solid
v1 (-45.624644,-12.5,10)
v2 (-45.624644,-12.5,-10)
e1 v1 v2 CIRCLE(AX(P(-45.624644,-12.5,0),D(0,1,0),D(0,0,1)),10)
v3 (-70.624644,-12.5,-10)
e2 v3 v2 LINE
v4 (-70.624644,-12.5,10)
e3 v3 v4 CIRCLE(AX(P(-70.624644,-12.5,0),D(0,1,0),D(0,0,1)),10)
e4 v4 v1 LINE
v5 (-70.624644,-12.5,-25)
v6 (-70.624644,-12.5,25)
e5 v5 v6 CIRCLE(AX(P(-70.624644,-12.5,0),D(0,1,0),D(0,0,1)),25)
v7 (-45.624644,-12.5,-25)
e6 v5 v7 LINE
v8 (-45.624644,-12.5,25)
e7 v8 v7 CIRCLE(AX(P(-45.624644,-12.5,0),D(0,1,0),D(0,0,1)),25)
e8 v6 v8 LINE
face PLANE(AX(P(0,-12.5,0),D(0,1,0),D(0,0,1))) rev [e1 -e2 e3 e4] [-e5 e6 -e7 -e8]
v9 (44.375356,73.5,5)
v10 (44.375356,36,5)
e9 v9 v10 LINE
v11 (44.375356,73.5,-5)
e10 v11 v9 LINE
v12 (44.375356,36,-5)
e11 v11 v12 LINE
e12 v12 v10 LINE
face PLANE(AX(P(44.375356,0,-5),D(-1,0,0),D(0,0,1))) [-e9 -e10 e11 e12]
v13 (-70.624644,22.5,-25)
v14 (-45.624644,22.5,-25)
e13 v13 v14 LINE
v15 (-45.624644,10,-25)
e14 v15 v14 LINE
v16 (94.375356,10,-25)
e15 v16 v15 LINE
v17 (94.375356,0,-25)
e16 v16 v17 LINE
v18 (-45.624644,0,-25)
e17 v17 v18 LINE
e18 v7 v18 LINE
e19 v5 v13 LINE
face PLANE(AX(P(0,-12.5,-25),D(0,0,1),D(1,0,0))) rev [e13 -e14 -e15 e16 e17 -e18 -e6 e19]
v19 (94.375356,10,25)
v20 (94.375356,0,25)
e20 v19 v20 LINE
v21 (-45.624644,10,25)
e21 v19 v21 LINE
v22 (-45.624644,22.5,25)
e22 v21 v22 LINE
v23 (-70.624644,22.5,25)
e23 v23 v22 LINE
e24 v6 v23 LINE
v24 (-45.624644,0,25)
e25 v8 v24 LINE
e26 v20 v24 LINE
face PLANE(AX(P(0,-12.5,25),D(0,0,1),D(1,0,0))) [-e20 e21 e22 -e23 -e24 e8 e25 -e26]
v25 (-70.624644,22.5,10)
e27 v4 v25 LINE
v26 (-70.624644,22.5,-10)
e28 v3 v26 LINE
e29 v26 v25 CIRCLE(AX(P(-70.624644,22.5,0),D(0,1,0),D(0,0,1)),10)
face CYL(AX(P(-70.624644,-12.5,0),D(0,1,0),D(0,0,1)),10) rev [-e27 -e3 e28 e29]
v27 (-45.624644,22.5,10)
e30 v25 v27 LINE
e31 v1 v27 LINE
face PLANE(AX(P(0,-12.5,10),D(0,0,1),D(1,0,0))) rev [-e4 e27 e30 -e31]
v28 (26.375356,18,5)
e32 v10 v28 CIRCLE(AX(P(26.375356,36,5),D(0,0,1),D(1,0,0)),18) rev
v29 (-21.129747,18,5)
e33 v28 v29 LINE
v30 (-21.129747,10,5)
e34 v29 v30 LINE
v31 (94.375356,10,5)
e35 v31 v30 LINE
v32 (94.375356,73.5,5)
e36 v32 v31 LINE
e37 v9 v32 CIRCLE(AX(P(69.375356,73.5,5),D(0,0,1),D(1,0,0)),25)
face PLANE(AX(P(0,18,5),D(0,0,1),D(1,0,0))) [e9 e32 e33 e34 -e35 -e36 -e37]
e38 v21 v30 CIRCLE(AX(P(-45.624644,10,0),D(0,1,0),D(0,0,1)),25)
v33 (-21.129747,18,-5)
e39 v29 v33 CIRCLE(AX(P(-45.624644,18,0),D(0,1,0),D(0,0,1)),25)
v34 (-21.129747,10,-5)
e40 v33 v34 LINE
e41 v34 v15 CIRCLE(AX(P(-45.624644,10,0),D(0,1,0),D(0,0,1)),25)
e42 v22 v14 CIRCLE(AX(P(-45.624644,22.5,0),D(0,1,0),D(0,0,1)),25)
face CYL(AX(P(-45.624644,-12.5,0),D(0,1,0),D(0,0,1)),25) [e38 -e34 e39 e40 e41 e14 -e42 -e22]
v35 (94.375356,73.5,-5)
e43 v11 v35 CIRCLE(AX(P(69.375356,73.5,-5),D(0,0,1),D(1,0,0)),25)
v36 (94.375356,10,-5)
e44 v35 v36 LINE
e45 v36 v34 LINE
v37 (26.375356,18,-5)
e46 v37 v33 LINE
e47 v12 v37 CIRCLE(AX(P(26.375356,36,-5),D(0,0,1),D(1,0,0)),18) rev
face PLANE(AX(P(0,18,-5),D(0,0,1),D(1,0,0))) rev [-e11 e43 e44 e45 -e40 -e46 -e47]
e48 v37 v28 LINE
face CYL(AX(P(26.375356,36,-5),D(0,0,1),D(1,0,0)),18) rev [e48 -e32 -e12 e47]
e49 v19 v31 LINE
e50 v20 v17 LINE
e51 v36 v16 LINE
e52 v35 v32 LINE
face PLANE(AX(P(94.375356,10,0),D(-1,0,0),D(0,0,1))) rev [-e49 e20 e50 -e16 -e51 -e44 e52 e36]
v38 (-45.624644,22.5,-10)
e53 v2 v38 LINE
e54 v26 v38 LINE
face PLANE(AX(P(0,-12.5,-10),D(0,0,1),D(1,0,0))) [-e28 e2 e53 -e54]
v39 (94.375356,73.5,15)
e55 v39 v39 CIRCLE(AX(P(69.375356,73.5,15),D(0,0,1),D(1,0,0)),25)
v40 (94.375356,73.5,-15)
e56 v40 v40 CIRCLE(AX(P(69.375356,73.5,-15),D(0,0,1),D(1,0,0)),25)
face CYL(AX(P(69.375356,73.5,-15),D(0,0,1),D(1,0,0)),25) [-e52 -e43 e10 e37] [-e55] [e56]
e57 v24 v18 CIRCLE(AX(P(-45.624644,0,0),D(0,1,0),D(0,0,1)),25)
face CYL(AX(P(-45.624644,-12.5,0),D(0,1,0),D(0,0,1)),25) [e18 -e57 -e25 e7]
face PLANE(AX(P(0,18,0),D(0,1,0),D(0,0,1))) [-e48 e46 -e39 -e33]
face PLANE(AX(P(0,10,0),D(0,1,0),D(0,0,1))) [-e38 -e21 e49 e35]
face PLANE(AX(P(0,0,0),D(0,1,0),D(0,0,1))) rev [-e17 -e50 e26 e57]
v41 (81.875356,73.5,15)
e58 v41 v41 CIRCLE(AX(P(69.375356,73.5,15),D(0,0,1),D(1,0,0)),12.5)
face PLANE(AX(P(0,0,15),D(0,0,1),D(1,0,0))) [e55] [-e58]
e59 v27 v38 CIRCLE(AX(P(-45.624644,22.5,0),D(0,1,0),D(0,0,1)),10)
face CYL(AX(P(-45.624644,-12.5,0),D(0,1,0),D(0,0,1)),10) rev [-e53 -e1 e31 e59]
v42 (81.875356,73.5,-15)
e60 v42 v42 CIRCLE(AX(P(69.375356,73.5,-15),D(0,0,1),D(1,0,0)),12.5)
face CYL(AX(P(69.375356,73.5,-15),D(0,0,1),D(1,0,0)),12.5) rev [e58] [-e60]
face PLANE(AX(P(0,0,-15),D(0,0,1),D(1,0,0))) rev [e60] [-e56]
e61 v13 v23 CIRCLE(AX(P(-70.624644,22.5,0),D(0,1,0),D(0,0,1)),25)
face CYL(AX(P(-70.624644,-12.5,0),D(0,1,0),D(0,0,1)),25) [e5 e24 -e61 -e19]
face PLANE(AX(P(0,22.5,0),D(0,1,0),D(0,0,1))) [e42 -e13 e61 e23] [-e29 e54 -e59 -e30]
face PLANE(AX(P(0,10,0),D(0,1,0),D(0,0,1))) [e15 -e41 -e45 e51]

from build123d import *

# Parameters (mm, degrees)
BOSS_EXTRUDE10_DEPTH       = 22.5
BOSS_EXTRUDE10_DEPTH_BACK  = 12.5
BOSS_EXTRUDE11_DEPTH       = 10
BOSS_EXTRUDE12_DEPTH       = 18
BOSS_EXTRUDE13_DEPTH       = 5
BOSS_EXTRUDE13_DEPTH_BACK  = 5
BOSS_EXTRUDE14_START       = -15
BOSS_EXTRUDE14_OUTLINE_R   = 25
BOSS_EXTRUDE14_OUTLINE_R_2 = 12.5
BOSS_EXTRUDE14_DEPTH       = 30


# Read off the part's stored shape, not the designer's step: Boss-Extrude14
with BuildPart() as part:
    # Sketch1 → Boss-Extrude10 (new, two sides: drawn at the far end of the back side and taken through both)
    with BuildSketch(Plane(origin=(0, 0, 0), x_dir=(1, 0, 0), z_dir=(0, 1, 0)).offset(-BOSS_EXTRUDE10_DEPTH_BACK)):
        with BuildLine():
            Line((-70.624644485, -25), (-45.624644485, -25))
            ThreePointArc((-45.624644485, -25), (-20.624644485, 0), (-45.624644485, 25))
            Line((-45.624644485, 25), (-70.624644485, 25))
            ThreePointArc((-70.624644485, 25), (-95.624644485, 0), (-70.624644485, -25))
        make_face()
        with BuildLine():
            ThreePointArc((-45.624644485, -10), (-35.624644485, 0), (-45.624644485, 10))
            Line((-45.624644485, 10), (-70.624644485, 10))
            ThreePointArc((-70.624644485, 10), (-80.624644485, 0), (-70.624644485, -10))
            Line((-70.624644485, -10), (-45.624644485, -10))
        make_face(mode=Mode.SUBTRACT)
    extrude(amount=BOSS_EXTRUDE10_DEPTH + BOSS_EXTRUDE10_DEPTH_BACK)

    # Sketch1<6> → Boss-Extrude11 (add)
    with BuildSketch(Plane(origin=(0, 0, 0), x_dir=(1, 0, 0), z_dir=(0, 1, 0))):
        with BuildLine():
            ThreePointArc((-21.129747057, -5), (-29.813256184, -19.364916731), (-45.624644485, -25))
            Line((-45.624644485, -25), (94.375355515, -25))
            Line((94.375355515, -25), (94.375355515, -5))
            Line((94.375355515, -5), (-21.129747057, -5))
        make_face()
        with BuildLine():
            Line((94.375355515, 25), (-45.624644485, 25))
            ThreePointArc((-45.624644485, 25), (-29.813256184, 19.364916731), (-21.129747057, 5))
            Line((-21.129747057, 5), (94.375355515, 5))
            Line((94.375355515, 5), (94.375355515, 25))
        make_face()
    extrude(amount=BOSS_EXTRUDE11_DEPTH)

    # Sketch1<7> → Boss-Extrude12 (add)
    with BuildSketch(Plane(origin=(0, 0, 0), x_dir=(1, 0, 0), z_dir=(0, 1, 0))):
        with BuildLine():
            Line((94.375355515, 5), (-21.129747057, 5))
            ThreePointArc((-21.129747057, 5), (-20.624644485, 0), (-21.129747057, -5))
            Line((-21.129747057, -5), (94.375355515, -5))
            Line((94.375355515, -5), (94.375355515, 5))
        make_face()
    extrude(amount=BOSS_EXTRUDE12_DEPTH)

    # Sketch2 → Boss-Extrude13 (add, two sides: drawn at the far end of the back side and taken through both)
    with BuildSketch(Plane.XY.offset(-BOSS_EXTRUDE13_DEPTH_BACK)):
        with BuildLine():
            ThreePointArc((44.375355515, 36), (39.103277576, 23.272077939), (26.375355515, 18))
            Line((26.375355515, 18), (94.375355515, 18))
            Line((94.375355515, 18), (94.375355515, 73.5))
            ThreePointArc((94.375355515, 73.5), (69.375355515, 48.5), (44.375355515, 73.5))
            Line((44.375355515, 73.5), (44.375355515, 36))
        make_face()
    extrude(amount=BOSS_EXTRUDE13_DEPTH + BOSS_EXTRUDE13_DEPTH_BACK)

    # Boss-Extrude14 outline → Boss-Extrude14 (add)
    with BuildSketch(Plane.XY.offset(BOSS_EXTRUDE14_START)):
        with Locations((69.375355515, 73.5)):
            Circle(BOSS_EXTRUDE14_OUTLINE_R)
        with Locations((69.375355515, 73.5)):
            Circle(BOSS_EXTRUDE14_OUTLINE_R_2, mode=Mode.SUBTRACT)
    extrude(amount=BOSS_EXTRUDE14_DEPTH)


solid = part.part
